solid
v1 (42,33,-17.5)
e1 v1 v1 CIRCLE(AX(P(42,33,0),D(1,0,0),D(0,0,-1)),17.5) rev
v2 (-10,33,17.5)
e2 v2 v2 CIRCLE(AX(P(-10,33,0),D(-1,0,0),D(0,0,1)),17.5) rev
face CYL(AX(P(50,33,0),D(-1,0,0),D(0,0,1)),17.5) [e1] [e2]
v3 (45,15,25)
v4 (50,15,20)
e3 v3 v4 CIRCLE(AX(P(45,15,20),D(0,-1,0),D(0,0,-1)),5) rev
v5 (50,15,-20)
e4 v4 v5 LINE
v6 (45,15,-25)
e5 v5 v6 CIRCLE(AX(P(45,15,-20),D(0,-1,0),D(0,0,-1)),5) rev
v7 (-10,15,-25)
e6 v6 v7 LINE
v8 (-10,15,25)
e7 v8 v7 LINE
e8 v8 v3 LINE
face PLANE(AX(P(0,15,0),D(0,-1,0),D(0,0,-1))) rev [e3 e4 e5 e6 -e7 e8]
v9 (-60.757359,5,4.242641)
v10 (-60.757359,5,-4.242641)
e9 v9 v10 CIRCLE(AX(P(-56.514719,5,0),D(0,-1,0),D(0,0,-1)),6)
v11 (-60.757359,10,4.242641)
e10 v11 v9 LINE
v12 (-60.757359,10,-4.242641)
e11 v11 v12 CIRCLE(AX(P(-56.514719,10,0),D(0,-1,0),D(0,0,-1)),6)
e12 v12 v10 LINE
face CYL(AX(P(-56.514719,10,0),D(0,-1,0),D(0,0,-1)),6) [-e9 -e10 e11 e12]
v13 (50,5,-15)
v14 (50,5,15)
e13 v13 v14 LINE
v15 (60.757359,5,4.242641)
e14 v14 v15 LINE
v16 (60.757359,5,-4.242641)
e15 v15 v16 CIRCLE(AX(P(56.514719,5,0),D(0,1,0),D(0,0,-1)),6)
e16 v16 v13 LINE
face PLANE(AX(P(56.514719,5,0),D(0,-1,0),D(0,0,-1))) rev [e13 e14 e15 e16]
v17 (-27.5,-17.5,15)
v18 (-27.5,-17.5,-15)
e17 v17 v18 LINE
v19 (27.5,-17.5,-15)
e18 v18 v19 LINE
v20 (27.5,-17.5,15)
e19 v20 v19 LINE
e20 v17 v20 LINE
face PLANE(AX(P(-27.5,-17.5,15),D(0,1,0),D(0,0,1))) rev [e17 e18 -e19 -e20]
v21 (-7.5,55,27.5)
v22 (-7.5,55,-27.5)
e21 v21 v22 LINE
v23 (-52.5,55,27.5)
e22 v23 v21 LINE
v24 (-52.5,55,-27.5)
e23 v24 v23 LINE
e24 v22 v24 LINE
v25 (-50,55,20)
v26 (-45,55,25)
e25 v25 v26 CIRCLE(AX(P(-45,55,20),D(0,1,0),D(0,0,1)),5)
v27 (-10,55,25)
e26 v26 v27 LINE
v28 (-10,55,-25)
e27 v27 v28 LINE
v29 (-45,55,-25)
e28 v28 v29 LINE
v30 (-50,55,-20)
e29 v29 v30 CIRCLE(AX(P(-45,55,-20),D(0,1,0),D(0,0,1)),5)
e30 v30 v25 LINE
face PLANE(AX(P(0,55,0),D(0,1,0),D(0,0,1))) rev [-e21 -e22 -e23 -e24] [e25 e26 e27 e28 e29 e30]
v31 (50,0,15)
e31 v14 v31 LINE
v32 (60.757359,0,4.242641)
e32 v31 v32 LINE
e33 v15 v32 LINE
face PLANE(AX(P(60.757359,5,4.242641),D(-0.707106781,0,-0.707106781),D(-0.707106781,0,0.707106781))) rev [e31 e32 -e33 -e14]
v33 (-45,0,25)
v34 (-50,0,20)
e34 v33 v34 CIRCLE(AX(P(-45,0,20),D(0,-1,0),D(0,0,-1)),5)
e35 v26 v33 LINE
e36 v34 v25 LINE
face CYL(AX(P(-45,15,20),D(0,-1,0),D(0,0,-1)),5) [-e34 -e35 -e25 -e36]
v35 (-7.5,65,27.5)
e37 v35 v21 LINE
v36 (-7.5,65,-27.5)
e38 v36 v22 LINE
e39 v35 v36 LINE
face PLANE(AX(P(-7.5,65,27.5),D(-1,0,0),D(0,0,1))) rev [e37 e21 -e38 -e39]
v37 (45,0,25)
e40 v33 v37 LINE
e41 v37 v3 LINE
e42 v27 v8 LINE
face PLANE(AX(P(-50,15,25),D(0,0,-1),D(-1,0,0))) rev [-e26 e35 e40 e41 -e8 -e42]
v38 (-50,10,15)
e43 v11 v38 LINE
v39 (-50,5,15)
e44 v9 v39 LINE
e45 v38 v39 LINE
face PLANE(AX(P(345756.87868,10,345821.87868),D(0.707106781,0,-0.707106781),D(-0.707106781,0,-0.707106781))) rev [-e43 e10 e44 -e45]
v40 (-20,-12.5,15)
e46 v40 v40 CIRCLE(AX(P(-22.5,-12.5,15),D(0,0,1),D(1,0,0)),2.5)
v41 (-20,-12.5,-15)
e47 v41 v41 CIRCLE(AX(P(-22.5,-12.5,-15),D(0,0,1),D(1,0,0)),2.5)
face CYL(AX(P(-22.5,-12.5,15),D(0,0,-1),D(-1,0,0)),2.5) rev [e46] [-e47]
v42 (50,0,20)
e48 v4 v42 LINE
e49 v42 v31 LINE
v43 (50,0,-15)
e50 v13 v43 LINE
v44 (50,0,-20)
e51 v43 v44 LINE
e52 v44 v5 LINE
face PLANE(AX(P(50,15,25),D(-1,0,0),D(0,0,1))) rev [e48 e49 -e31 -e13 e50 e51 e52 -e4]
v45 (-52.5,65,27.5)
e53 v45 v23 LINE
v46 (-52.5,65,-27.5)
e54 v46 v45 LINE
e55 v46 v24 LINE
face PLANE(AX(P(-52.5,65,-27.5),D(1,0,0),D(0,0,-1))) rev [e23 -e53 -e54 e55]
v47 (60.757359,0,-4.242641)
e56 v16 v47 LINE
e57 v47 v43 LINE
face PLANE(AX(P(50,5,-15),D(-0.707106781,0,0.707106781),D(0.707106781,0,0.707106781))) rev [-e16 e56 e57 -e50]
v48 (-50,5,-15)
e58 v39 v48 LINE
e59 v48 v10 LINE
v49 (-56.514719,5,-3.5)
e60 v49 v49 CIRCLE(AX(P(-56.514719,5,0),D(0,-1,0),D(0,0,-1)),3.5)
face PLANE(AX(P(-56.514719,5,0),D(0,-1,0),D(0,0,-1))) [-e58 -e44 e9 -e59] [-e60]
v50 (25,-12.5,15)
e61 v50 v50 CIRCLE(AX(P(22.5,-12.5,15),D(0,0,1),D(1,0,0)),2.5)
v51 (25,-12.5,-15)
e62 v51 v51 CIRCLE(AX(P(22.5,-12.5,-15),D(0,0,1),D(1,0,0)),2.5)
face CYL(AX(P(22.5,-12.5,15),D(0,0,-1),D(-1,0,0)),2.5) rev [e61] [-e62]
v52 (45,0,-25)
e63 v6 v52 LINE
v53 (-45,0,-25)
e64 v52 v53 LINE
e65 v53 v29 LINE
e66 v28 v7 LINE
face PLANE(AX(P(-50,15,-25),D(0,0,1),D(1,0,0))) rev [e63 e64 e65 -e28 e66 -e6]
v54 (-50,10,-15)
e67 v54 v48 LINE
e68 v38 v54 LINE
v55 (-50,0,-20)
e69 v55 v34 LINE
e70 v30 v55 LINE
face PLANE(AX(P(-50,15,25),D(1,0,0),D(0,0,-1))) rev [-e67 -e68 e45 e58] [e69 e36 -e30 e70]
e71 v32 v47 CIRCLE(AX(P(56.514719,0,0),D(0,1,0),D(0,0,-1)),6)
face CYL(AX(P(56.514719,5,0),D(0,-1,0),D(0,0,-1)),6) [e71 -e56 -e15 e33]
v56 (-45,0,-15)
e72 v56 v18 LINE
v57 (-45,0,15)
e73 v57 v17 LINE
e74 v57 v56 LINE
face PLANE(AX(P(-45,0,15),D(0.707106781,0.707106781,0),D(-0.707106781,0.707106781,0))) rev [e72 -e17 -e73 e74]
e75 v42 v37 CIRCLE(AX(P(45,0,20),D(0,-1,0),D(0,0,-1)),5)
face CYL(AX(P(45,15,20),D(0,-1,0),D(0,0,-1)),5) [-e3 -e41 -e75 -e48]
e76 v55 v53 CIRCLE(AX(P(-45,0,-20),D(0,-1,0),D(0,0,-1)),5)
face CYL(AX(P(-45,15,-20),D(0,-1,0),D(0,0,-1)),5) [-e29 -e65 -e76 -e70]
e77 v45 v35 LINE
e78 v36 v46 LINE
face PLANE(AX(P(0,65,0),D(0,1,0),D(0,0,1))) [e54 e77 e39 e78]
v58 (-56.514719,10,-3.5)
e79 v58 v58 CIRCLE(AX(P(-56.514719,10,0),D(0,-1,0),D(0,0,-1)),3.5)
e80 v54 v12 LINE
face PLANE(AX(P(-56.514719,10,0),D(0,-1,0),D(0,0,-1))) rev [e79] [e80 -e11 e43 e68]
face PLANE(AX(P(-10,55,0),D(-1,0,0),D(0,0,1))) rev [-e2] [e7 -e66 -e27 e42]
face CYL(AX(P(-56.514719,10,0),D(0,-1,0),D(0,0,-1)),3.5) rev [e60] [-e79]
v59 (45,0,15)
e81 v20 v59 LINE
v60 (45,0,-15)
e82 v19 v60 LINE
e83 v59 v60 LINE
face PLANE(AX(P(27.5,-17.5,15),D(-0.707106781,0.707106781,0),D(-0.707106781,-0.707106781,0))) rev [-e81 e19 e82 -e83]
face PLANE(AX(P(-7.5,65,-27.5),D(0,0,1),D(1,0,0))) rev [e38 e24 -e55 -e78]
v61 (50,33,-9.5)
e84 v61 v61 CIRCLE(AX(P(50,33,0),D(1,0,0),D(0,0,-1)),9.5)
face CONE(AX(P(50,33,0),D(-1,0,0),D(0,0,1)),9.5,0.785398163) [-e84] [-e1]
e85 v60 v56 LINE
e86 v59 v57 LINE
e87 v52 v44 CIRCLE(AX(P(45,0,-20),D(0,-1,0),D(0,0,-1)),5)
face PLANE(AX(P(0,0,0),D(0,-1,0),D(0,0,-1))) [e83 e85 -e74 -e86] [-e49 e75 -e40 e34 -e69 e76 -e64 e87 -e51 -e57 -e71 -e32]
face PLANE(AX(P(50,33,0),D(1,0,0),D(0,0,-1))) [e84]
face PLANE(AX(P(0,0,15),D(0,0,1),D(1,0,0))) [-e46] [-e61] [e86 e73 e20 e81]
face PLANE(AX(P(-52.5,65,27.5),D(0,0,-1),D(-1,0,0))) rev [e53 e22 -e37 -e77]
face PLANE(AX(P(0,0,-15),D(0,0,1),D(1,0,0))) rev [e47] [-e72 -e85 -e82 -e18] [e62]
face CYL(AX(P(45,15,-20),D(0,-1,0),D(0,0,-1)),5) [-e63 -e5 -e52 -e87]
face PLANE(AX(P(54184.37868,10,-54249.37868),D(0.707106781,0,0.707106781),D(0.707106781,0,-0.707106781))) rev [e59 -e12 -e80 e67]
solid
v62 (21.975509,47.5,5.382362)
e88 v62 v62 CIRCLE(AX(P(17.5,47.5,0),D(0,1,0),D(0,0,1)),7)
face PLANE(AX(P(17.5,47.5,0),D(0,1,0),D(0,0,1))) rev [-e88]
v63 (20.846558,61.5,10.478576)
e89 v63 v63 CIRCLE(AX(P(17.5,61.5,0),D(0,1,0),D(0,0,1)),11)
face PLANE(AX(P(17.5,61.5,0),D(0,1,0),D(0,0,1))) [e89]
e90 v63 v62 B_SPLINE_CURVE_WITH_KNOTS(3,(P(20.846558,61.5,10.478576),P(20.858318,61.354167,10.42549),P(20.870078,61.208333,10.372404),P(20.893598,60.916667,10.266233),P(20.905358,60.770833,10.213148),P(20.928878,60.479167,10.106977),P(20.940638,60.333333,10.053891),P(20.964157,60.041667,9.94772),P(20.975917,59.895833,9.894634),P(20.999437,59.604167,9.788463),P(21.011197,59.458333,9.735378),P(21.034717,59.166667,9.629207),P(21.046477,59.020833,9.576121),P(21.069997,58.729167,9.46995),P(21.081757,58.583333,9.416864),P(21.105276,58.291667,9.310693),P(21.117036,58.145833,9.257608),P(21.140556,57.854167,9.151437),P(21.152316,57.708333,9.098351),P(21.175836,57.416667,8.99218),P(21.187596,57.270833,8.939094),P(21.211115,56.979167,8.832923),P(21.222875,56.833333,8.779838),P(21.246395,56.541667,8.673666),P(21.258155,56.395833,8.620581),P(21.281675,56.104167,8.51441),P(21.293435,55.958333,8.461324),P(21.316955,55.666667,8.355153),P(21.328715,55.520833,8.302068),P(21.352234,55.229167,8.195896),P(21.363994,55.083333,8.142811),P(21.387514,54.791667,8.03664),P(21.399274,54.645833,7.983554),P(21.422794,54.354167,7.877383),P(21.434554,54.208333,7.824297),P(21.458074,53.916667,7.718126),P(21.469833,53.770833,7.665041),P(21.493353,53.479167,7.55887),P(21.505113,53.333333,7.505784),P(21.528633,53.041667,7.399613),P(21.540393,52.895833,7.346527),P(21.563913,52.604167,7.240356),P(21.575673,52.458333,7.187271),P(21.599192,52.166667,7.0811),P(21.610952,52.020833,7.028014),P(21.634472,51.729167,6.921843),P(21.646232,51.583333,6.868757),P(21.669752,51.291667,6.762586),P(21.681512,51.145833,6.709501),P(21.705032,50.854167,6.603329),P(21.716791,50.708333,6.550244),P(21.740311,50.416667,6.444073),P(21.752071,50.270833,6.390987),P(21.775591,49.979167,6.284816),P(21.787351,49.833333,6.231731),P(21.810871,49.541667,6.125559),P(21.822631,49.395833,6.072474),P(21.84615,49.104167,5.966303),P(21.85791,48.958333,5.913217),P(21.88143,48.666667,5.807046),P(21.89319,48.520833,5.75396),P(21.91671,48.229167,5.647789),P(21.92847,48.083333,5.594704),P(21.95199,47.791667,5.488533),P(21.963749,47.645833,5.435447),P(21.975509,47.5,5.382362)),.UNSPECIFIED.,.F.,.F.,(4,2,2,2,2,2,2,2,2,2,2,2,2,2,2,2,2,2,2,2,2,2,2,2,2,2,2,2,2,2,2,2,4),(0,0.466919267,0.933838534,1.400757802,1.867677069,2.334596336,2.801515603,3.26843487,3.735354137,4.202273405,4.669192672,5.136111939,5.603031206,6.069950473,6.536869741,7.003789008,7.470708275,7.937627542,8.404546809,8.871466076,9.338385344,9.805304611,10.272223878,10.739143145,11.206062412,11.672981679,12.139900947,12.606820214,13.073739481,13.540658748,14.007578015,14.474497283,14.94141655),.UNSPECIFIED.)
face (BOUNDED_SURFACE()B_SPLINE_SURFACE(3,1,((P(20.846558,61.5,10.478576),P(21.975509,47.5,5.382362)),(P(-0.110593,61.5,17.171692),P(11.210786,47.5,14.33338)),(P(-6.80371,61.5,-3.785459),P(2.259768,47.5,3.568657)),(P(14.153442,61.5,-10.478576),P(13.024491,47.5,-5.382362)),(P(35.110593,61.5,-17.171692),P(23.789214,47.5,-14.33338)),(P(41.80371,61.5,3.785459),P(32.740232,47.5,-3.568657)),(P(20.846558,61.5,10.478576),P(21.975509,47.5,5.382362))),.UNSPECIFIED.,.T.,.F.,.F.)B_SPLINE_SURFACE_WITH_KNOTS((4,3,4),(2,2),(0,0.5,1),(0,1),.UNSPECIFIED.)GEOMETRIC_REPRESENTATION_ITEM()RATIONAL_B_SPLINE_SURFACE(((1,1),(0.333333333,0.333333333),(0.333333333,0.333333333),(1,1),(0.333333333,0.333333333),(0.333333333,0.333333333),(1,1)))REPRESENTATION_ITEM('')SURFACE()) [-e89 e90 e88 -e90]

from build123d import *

# Parameters (mm, degrees)
SKETCH1_W           = 100
SKETCH1_H           = 50
BOSS_EXTRUDE1_DEPTH = 15
SHELL1_T            = -5
FILLET1_R           = 5
SKETCH2_R           = 2.5
BOSS_EXTRUDE2_DEPTH = 15
BOSS_EXTRUDE3_DEPTH = 5
BOSS_EXTRUDE4_START = 5
SKETCH4_R           = 3.5
BOSS_EXTRUDE4_DEPTH = 5
SKETCH5_W           = 90
SKETCH5_H           = 40
BOSS_EXTRUDE5_DEPTH = 10
BOSS_EXTRUDE6_START = 40
BOSS_EXTRUDE6_DEPTH = 40
SKETCH7_W           = 45
SKETCH7_H           = 55
BOSS_EXTRUDE7_DEPTH = 10
SKETCH8_R           = 17.5
BOSS_EXTRUDE8_DEPTH = 60
CHAMFER1_SIZE       = 8


with BuildPart() as part:
    # Sketch1 → Boss-Extrude1 (new body)
    with BuildSketch(Plane(origin=(0, 0, 0), x_dir=(1, 0, 0), z_dir=(0, 1, 0))):
        Rectangle(SKETCH1_W, SKETCH1_H)
    extrude(amount=BOSS_EXTRUDE1_DEPTH)

    # Shell1
    shell1_openings = [part.faces().sort_by_distance(p)[0] for p in [
        (0, 15, 0),
    ]]
    offset(amount=SHELL1_T, openings=shell1_openings, kind=Kind.INTERSECTION)

    # Fillet1
    fillet1_edges = [part.edges().sort_by_distance(p)[0] for p in [
        (50, 7.5, 25),
        (-50, 7.5, 25),
        (-50, 7.5, -25),
        (50, 7.5, -25),
    ]]
    fillet(fillet1_edges, radius=FILLET1_R)

    # Sketch2 → Boss-Extrude2 (add, symmetric)
    with BuildSketch(Plane.XY):
        Polygon((-45, 0), (-27.5, -17.5), (27.5, -17.5), (45, 0), align=None)
        with Locations((-22.5, -12.5)):
            Circle(SKETCH2_R, mode=Mode.SUBTRACT)
        with Locations((22.5, -12.5)):
            Circle(SKETCH2_R, mode=Mode.SUBTRACT)
    extrude(amount=BOSS_EXTRUDE2_DEPTH, both=True)

    # Sketch3 → Boss-Extrude3 (add)
    with BuildSketch(Plane(origin=(0, 0, 0), x_dir=(1, 0, 0), z_dir=(0, 1, 0))):
        with BuildLine():
            Line((50, 15), (60.757359313, 4.242640687))
            ThreePointArc((60.757359313, 4.242640687), (62.514718626, 0), (60.757359313, -4.242640687))
            Line((60.757359313, -4.242640687), (50, -15))
            Line((50, -15), (50, 15))
        make_face()
    extrude(amount=BOSS_EXTRUDE3_DEPTH)

    # Sketch4 → Boss-Extrude4 (add)
    with BuildSketch(Plane(origin=(0, 0, 0), x_dir=(1, 0, 0), z_dir=(0, 1, 0)).offset(BOSS_EXTRUDE4_START)):
        with BuildLine():
            Line((-50, 15), (-60.757359313, 4.242640687))
            ThreePointArc((-60.757359313, 4.242640687), (-62.514718626, 0), (-60.757359313, -4.242640687))
            Line((-60.757359313, -4.242640687), (-50, -15))
            Line((-50, -15), (-50, 15))
        make_face()
        with Locations(Location((-56.514718626, 0, 0), (0, 0, 90))):
            Circle(SKETCH4_R, mode=Mode.SUBTRACT)
    extrude(amount=BOSS_EXTRUDE4_DEPTH)

    # Sketch5 → Boss-Extrude5 (add)
    with BuildSketch(Plane(origin=(0, 5, 0), x_dir=(1, 0, 0), z_dir=(0, 1, 0))):
        Rectangle(SKETCH5_W, SKETCH5_H)
    extrude(amount=BOSS_EXTRUDE5_DEPTH)

    # Sketch6 → Boss-Extrude6 (add)
    with BuildSketch(Plane(origin=(0, 15, 0), x_dir=(1, 0, 0), z_dir=(0, 1, 0)).offset(BOSS_EXTRUDE6_START)):
        with BuildLine():
            Line((-45, -25), (-10, -25))
            Line((-10, -25), (-10, 25))
            Line((-10, 25), (-45, 25))
            ThreePointArc((-45, 25), (-48.535533906, 23.535533906), (-50, 20))
            Line((-50, 20), (-50, -20))
            ThreePointArc((-50, -20), (-48.535533906, -23.535533906), (-45, -25))
        make_face()
    extrude(amount=-BOSS_EXTRUDE6_DEPTH)

    # Sketch7 → Boss-Extrude7 (add)
    with BuildSketch(Plane(origin=(0, 55, 0), x_dir=(1, 0, 0), z_dir=(0, 1, 0))):
        with Locations((-30, 0)):
            Rectangle(SKETCH7_W, SKETCH7_H)
    extrude(amount=BOSS_EXTRUDE7_DEPTH)

    # Sketch8 → Boss-Extrude8 (add)
    with BuildSketch(Plane(origin=(-10, 0, 0), x_dir=(0, 0, -1), z_dir=(1, 0, 0))):
        with Locations(Location((0, 33, 0), (0, 0, 180))):
            Circle(SKETCH8_R)
    extrude(amount=BOSS_EXTRUDE8_DEPTH)

    # Chamfer1
    chamfer1_edges = [part.edges().sort_by_distance(p)[0] for p in [
        (50, 33, -17.5),
    ]]
    chamfer(chamfer1_edges, length=CHAMFER1_SIZE)


with BuildPart() as body_2:
    # Loft1: read off the stored shape, not the designer's step
    # Loft1: loft between two sections, ruled curve by curve
    loft1_from = [
        Edge.make_bspline([(20.846558371, 61.5, 10.478575622), (-0.110592873, 61.5, 17.171692365), (-6.803709615, 61.5, -3.785458879), (14.153441629, 61.5, -10.478575622), (35.110592873, 61.5, -17.171692365), (41.803709615, 61.5, 3.785458879), (20.846558371, 61.5, 10.478575622)], [0, 0, 0, 0, 0.5, 0.5, 0.5, 1, 1, 1, 1], 3, [1, 0.333333333, 0.333333333, 1, 0.333333333, 0.333333333, 1]),
    ]
    loft1_to = [
        Edge.make_bspline([(21.975509399, 47.5, 5.382361528), (11.210786342, 47.5, 14.333380326), (2.259767545, 47.5, 3.568657269), (13.024490601, 47.5, -5.382361528), (23.789213658, 47.5, -14.333380326), (32.740232455, 47.5, -3.568657269), (21.975509399, 47.5, 5.382361528)], [0, 0, 0, 0, 0.5, 0.5, 0.5, 1, 1, 1, 1], 3, [1, 0.333333333, 0.333333333, 1, 0.333333333, 0.333333333, 1]),
    ]
    loft1 = Solid(Shell([*[Face.make_surface_from_curves(loft1_from[k], loft1_to[k]) for k in range(1)], Face(Wire(loft1_from)), Face(Wire(loft1_to))]))
    add(loft1)


solid = Compound([part.part, body_2.part])
